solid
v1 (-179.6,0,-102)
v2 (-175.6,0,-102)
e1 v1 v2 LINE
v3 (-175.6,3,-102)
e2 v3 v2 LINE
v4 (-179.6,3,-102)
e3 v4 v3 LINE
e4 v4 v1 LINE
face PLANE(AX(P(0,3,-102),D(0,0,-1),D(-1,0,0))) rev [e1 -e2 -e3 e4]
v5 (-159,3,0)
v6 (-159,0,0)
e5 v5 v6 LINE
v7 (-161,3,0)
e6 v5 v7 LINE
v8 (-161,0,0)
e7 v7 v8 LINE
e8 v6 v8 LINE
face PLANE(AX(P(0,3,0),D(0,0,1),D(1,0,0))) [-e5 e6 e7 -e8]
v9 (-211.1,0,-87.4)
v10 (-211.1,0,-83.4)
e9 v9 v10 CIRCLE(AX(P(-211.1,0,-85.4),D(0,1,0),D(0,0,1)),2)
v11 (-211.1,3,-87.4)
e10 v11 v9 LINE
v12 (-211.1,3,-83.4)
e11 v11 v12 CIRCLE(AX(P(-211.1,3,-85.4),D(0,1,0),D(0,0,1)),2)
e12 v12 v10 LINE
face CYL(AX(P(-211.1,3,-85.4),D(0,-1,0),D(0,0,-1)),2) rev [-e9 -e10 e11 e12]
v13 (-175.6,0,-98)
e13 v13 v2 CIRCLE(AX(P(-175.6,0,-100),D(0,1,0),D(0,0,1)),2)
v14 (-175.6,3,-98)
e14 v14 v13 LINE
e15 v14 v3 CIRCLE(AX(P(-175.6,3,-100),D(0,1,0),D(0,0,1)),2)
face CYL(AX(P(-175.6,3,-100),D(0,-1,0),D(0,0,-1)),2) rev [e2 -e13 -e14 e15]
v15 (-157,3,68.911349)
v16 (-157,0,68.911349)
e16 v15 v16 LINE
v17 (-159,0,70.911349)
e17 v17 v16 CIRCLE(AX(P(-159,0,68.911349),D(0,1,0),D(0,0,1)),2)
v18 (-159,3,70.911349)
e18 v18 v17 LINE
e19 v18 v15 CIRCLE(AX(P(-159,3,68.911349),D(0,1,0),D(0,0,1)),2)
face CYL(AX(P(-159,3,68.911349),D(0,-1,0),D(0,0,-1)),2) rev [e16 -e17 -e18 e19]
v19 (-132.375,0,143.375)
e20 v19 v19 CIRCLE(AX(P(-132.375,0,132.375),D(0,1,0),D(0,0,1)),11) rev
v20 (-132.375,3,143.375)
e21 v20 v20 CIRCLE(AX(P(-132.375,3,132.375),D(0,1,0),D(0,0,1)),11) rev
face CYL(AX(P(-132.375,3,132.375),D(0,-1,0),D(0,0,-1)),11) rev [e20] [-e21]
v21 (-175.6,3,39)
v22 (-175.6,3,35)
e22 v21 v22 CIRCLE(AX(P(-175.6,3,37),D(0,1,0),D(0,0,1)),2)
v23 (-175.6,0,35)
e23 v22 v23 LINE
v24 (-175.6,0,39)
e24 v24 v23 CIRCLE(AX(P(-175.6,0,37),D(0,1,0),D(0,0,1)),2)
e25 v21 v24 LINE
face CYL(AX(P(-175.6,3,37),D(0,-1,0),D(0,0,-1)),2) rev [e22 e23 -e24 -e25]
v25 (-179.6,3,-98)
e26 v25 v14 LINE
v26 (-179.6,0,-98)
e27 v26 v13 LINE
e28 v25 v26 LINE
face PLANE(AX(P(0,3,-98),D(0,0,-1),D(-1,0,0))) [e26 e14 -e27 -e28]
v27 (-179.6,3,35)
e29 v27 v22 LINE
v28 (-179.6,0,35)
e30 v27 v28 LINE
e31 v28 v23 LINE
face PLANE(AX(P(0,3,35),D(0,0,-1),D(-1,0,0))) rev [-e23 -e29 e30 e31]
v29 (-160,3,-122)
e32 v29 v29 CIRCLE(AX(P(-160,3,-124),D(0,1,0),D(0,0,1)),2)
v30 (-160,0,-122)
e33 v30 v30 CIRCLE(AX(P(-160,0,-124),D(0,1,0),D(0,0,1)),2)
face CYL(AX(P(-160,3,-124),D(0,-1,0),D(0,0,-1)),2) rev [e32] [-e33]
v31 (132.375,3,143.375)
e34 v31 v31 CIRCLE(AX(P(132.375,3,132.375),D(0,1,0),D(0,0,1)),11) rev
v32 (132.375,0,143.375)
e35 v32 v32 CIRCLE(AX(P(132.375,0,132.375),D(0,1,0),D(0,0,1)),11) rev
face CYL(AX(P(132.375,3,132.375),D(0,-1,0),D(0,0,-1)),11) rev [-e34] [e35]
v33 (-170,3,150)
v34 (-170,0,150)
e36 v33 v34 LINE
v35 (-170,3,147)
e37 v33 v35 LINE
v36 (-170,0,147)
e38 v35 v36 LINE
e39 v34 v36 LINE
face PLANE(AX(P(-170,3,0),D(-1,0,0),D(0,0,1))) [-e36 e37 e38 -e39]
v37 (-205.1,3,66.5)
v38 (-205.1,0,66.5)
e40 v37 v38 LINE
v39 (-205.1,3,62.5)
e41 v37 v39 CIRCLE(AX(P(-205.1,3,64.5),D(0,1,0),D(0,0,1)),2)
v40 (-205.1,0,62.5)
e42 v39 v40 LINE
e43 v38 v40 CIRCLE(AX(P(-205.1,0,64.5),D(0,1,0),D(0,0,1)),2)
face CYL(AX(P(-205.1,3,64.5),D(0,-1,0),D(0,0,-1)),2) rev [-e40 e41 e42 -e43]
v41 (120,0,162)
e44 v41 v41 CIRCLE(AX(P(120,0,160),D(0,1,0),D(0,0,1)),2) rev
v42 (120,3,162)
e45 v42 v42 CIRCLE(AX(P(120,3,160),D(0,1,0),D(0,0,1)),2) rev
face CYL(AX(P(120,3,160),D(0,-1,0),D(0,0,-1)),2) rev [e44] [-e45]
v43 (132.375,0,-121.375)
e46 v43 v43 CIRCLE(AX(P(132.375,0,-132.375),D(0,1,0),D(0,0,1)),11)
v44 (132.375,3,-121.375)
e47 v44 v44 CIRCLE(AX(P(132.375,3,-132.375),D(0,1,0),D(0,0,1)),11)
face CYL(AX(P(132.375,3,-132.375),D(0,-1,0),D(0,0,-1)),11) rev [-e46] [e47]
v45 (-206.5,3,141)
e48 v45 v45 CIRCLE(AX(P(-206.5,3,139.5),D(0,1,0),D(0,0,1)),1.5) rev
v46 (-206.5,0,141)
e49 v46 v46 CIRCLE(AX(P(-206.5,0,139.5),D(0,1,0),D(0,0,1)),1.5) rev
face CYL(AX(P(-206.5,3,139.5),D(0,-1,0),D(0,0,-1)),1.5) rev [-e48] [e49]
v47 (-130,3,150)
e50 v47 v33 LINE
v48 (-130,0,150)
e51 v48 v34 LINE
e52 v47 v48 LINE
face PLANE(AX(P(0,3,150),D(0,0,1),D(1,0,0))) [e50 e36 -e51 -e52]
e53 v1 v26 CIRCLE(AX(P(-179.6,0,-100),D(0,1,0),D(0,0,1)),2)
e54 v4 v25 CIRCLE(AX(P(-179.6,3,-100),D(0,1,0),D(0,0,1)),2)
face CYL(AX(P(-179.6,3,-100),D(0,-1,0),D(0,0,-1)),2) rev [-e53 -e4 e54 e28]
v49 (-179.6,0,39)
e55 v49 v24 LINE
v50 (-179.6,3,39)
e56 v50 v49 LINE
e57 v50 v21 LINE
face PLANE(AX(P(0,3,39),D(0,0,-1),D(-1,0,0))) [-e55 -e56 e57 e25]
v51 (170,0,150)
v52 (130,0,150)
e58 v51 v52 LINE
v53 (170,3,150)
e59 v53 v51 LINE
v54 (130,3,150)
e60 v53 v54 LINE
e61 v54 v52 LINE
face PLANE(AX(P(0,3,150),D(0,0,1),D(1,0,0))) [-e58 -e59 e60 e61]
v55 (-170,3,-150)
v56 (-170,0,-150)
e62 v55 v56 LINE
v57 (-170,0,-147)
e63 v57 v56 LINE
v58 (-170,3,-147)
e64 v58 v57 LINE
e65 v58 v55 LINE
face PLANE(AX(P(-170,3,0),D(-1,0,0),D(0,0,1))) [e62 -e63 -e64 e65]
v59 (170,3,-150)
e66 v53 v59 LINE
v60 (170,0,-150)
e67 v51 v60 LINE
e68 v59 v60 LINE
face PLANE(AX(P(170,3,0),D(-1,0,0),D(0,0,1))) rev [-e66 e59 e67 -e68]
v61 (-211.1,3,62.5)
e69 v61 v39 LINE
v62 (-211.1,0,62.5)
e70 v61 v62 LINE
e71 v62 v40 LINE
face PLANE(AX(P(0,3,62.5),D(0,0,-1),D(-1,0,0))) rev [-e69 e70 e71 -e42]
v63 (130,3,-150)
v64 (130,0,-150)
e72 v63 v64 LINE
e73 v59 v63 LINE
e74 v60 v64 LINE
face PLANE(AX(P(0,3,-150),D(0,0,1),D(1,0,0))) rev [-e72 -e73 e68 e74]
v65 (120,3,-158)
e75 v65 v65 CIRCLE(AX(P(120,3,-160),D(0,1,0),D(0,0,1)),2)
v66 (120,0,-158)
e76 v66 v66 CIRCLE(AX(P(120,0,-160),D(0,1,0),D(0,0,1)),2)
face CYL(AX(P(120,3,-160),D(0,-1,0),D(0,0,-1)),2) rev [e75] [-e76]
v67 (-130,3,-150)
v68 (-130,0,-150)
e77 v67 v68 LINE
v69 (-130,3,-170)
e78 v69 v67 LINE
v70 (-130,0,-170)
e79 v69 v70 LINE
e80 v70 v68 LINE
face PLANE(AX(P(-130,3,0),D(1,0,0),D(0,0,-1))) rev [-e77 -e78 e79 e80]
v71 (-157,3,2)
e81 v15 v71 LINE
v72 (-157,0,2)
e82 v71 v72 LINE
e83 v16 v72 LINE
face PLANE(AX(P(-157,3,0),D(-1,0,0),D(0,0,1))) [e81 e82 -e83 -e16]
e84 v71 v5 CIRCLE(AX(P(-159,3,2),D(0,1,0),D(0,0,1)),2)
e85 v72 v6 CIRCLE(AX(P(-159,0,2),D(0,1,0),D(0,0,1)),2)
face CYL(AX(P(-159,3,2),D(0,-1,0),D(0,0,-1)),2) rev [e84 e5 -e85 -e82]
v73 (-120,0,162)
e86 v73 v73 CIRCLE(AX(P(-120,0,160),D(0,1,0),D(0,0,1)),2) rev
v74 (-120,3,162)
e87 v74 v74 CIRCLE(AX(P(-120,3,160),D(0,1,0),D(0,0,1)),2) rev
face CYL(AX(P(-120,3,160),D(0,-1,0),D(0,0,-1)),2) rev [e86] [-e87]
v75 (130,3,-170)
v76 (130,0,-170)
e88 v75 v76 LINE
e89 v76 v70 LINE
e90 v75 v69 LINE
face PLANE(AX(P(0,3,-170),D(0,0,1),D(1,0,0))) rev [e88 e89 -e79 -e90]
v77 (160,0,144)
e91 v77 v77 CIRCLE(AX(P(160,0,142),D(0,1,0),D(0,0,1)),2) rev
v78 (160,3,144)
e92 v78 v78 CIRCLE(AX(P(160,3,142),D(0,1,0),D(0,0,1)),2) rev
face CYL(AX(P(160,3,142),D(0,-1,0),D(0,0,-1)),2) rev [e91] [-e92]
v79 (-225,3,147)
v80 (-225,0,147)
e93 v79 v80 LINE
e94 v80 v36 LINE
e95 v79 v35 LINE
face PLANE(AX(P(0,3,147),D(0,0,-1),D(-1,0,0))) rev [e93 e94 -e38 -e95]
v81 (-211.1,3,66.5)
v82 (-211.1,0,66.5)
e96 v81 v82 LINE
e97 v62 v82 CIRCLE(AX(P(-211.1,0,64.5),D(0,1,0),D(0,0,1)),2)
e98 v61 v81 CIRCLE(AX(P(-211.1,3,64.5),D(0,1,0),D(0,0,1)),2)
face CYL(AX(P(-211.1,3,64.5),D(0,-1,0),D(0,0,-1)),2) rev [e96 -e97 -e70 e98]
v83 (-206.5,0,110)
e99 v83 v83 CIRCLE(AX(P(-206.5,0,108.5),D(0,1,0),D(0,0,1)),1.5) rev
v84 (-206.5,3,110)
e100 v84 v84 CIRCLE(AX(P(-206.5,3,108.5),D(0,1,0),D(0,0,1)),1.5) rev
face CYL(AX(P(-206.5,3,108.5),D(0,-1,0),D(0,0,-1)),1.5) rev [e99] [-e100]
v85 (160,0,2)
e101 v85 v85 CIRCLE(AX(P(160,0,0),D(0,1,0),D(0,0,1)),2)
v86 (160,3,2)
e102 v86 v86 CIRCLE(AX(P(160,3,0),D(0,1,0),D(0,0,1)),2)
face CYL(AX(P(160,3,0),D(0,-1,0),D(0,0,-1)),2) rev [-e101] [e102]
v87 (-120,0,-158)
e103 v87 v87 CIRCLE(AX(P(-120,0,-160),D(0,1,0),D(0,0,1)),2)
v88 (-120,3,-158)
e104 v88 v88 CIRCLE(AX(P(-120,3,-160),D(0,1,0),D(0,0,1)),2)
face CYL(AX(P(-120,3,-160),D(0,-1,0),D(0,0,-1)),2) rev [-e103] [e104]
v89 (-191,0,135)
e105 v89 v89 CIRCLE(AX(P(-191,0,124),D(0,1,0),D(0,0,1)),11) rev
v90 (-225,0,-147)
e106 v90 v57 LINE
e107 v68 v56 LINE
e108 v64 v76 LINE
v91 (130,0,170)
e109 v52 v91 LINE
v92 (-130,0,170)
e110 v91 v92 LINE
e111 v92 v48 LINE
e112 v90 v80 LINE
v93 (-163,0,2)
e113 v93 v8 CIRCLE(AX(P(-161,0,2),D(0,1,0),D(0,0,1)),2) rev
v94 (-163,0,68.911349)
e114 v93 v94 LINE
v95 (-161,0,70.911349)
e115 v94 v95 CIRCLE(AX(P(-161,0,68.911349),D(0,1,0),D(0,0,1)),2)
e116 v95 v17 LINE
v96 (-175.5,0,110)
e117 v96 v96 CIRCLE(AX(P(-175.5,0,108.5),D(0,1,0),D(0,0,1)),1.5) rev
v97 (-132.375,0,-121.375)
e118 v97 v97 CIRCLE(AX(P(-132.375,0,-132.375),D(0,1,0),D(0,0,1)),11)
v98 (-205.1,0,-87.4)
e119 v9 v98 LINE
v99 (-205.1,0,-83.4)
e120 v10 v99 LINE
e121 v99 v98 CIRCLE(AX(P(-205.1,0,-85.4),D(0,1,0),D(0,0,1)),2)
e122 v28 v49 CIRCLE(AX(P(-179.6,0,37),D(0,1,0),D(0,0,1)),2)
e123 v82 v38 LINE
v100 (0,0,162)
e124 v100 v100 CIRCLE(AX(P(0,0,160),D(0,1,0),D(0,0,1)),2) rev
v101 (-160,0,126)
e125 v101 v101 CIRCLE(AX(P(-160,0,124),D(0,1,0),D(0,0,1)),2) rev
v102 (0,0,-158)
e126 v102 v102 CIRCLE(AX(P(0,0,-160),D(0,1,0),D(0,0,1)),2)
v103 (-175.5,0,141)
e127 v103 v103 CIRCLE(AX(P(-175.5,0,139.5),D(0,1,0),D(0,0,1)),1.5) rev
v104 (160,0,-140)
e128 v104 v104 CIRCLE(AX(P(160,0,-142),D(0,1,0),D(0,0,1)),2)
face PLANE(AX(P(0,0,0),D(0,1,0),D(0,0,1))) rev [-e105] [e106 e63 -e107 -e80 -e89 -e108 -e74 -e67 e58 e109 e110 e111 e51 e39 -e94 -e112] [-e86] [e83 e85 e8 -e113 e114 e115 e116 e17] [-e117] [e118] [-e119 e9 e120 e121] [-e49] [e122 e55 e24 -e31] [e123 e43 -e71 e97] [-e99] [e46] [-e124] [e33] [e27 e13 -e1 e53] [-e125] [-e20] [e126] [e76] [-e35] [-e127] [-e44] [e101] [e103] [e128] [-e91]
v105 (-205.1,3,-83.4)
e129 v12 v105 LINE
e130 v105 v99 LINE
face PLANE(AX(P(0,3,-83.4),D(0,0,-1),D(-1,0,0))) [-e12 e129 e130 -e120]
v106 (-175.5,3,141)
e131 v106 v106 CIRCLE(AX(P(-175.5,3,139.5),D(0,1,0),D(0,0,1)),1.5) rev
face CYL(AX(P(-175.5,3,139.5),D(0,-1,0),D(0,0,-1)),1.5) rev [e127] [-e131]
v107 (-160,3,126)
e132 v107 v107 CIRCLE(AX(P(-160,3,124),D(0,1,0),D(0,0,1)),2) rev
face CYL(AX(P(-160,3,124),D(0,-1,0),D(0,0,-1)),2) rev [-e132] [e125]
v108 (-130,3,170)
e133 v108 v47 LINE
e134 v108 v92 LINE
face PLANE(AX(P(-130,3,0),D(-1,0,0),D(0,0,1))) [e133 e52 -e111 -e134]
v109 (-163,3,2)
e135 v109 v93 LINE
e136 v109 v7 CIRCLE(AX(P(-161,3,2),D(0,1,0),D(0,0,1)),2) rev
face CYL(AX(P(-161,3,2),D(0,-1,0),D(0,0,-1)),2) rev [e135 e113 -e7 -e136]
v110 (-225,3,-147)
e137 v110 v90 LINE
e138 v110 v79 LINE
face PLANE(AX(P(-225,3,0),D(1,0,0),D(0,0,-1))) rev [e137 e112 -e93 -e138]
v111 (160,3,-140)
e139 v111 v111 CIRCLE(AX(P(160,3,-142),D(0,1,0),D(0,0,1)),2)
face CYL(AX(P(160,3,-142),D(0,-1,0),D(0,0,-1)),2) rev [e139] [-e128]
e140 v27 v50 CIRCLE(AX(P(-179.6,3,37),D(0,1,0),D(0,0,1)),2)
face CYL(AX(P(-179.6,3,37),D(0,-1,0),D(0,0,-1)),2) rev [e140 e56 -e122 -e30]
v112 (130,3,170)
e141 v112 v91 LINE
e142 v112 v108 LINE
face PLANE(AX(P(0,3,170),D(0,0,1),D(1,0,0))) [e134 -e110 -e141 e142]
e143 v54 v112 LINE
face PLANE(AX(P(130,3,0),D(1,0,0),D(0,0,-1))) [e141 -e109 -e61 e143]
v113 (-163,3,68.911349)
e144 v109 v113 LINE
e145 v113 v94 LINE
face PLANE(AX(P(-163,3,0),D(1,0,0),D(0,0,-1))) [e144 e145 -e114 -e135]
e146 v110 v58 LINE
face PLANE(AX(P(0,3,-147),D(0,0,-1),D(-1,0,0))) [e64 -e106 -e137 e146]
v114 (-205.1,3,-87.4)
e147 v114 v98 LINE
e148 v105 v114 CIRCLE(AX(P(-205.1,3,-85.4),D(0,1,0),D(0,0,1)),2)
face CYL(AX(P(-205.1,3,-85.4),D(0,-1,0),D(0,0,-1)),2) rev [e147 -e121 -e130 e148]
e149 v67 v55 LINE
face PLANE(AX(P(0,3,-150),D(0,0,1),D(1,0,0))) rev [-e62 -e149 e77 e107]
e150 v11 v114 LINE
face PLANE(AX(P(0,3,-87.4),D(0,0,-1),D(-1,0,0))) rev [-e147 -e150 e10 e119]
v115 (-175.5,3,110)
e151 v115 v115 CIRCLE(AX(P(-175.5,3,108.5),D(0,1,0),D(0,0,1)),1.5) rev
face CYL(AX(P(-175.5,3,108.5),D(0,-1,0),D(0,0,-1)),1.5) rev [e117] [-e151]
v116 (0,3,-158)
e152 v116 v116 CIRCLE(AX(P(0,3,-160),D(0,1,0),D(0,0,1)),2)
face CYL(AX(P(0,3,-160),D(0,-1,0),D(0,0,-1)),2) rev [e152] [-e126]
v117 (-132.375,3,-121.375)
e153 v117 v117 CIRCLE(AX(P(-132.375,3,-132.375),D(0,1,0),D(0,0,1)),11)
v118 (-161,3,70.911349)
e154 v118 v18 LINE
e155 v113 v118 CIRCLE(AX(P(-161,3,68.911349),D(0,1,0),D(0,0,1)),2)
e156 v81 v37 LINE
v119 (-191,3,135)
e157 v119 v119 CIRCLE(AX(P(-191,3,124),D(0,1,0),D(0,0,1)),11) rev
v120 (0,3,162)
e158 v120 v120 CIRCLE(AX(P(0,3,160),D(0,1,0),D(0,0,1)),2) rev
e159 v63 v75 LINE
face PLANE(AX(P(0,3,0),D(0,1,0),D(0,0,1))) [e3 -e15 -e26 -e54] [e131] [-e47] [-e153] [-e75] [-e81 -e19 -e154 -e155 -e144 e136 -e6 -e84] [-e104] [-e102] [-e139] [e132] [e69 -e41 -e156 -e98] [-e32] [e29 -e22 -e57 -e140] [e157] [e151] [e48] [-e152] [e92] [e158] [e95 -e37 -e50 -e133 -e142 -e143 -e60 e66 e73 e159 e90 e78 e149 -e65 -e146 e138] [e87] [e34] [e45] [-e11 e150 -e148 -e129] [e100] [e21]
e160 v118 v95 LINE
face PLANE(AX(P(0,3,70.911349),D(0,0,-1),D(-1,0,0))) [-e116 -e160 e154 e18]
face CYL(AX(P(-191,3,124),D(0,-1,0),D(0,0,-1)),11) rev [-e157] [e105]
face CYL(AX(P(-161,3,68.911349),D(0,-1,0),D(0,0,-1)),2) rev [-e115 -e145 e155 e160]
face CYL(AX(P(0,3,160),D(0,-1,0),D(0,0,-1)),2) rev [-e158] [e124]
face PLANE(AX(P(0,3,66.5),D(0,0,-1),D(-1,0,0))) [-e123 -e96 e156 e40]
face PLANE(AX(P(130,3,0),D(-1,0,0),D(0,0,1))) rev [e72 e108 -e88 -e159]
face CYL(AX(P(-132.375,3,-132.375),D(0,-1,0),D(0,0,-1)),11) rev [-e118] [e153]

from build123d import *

# Parameters (mm, degrees)
SKETCH1_8_R         = 11
SKETCH1_8_R_2       = 2
SKETCH1_8_R_3       = 1.5
BOSS_EXTRUDE5_DEPTH = 3


with BuildPart() as part:
    # Sketch1<8> → Boss-Extrude5 (new body)
    with BuildSketch(Plane(origin=(0, 0, 0), x_dir=(1, 0, 0), z_dir=(0, 1, 0))):
        Polygon((130, -150), (170, -150), (170, 150), (130, 150), (130, 170), (-130, 170), (-130, 150), (-170, 150), (-170, 147), (-225, 147), (-225, -147), (-170, -147), (-170, -150), (-130, -150), (-130, -170), (130, -170), align=None)
        with Locations((132.375, -132.375)):
            Circle(SKETCH1_8_R, mode=Mode.SUBTRACT)
        with Locations((132.375, 132.375)):
            Circle(SKETCH1_8_R, mode=Mode.SUBTRACT)
        with Locations((160, -142)):
            Circle(SKETCH1_8_R_2, mode=Mode.SUBTRACT)
        with Locations((160, 0)):
            Circle(SKETCH1_8_R_2, mode=Mode.SUBTRACT)
        with Locations((160, 142)):
            Circle(SKETCH1_8_R_2, mode=Mode.SUBTRACT)
        with Locations((-132.375, 132.375)):
            Circle(SKETCH1_8_R, mode=Mode.SUBTRACT)
        with BuildLine():
            ThreePointArc((-163, -2), (-162.414213562, -0.585786438), (-161, 0))
            Line((-161, 0), (-159, 0))
            ThreePointArc((-159, 0), (-157.585786438, -0.585786438), (-157, -2))
            Line((-157, -2), (-157, -68.911348687))
            ThreePointArc((-157, -68.911348687), (-157.585786438, -70.325562249), (-159, -70.911348687))
            Line((-159, -70.911348687), (-161, -70.911348687))
            ThreePointArc((-161, -70.911348687), (-162.414213562, -70.325562249), (-163, -68.911348687))
            Line((-163, -68.911348687), (-163, -2))
        make_face(mode=Mode.SUBTRACT)
        with Locations((-160, 124)):
            Circle(SKETCH1_8_R_2, mode=Mode.SUBTRACT)
        with Locations((-132.375, -132.375)):
            Circle(SKETCH1_8_R, mode=Mode.SUBTRACT)
        with Locations((-160, -124)):
            Circle(SKETCH1_8_R_2, mode=Mode.SUBTRACT)
        with Locations((0, -160)):
            Circle(SKETCH1_8_R_2, mode=Mode.SUBTRACT)
        with Locations((120, -160)):
            Circle(SKETCH1_8_R_2, mode=Mode.SUBTRACT)
        with Locations((-120, -160)):
            Circle(SKETCH1_8_R_2, mode=Mode.SUBTRACT)
        with Locations((-175.5, -108.5)):
            Circle(SKETCH1_8_R_3, mode=Mode.SUBTRACT)
        with Locations((-206.5, -139.5)):
            Circle(SKETCH1_8_R_3, mode=Mode.SUBTRACT)
        with Locations((-175.5, -139.5)):
            Circle(SKETCH1_8_R_3, mode=Mode.SUBTRACT)
        with Locations((-191, -124)):
            Circle(SKETCH1_8_R, mode=Mode.SUBTRACT)
        with Locations((-206.5, -108.5)):
            Circle(SKETCH1_8_R_3, mode=Mode.SUBTRACT)
        with BuildLine():
            ThreePointArc((-211.1, -66.5), (-213.1, -64.5), (-211.1, -62.5))
            Line((-211.1, -62.5), (-205.1, -62.5))
            ThreePointArc((-205.1, -62.5), (-203.1, -64.5), (-205.1, -66.5))
            Line((-205.1, -66.5), (-211.1, -66.5))
        make_face(mode=Mode.SUBTRACT)
        with BuildLine():
            ThreePointArc((-179.6, -39), (-181.6, -37), (-179.6, -35))
            Line((-179.6, -35), (-175.6, -35))
            ThreePointArc((-175.6, -35), (-173.6, -37), (-175.6, -39))
            Line((-175.6, -39), (-179.6, -39))
        make_face(mode=Mode.SUBTRACT)
        with BuildLine():
            ThreePointArc((-211.1, 83.4), (-213.1, 85.4), (-211.1, 87.4))
            Line((-211.1, 87.4), (-205.1, 87.4))
            ThreePointArc((-205.1, 87.4), (-203.1, 85.4), (-205.1, 83.4))
            Line((-205.1, 83.4), (-211.1, 83.4))
        make_face(mode=Mode.SUBTRACT)
        with BuildLine():
            ThreePointArc((-179.6, 98), (-181.6, 100), (-179.6, 102))
            Line((-179.6, 102), (-175.6, 102))
            ThreePointArc((-175.6, 102), (-173.6, 100), (-175.6, 98))
            Line((-175.6, 98), (-179.6, 98))
        make_face(mode=Mode.SUBTRACT)
        with Locations((0, 160)):
            Circle(SKETCH1_8_R_2, mode=Mode.SUBTRACT)
        with Locations((120, 160)):
            Circle(SKETCH1_8_R_2, mode=Mode.SUBTRACT)
        with Locations((-120, 160)):
            Circle(SKETCH1_8_R_2, mode=Mode.SUBTRACT)
    extrude(amount=BOSS_EXTRUDE5_DEPTH)


solid = part.part
